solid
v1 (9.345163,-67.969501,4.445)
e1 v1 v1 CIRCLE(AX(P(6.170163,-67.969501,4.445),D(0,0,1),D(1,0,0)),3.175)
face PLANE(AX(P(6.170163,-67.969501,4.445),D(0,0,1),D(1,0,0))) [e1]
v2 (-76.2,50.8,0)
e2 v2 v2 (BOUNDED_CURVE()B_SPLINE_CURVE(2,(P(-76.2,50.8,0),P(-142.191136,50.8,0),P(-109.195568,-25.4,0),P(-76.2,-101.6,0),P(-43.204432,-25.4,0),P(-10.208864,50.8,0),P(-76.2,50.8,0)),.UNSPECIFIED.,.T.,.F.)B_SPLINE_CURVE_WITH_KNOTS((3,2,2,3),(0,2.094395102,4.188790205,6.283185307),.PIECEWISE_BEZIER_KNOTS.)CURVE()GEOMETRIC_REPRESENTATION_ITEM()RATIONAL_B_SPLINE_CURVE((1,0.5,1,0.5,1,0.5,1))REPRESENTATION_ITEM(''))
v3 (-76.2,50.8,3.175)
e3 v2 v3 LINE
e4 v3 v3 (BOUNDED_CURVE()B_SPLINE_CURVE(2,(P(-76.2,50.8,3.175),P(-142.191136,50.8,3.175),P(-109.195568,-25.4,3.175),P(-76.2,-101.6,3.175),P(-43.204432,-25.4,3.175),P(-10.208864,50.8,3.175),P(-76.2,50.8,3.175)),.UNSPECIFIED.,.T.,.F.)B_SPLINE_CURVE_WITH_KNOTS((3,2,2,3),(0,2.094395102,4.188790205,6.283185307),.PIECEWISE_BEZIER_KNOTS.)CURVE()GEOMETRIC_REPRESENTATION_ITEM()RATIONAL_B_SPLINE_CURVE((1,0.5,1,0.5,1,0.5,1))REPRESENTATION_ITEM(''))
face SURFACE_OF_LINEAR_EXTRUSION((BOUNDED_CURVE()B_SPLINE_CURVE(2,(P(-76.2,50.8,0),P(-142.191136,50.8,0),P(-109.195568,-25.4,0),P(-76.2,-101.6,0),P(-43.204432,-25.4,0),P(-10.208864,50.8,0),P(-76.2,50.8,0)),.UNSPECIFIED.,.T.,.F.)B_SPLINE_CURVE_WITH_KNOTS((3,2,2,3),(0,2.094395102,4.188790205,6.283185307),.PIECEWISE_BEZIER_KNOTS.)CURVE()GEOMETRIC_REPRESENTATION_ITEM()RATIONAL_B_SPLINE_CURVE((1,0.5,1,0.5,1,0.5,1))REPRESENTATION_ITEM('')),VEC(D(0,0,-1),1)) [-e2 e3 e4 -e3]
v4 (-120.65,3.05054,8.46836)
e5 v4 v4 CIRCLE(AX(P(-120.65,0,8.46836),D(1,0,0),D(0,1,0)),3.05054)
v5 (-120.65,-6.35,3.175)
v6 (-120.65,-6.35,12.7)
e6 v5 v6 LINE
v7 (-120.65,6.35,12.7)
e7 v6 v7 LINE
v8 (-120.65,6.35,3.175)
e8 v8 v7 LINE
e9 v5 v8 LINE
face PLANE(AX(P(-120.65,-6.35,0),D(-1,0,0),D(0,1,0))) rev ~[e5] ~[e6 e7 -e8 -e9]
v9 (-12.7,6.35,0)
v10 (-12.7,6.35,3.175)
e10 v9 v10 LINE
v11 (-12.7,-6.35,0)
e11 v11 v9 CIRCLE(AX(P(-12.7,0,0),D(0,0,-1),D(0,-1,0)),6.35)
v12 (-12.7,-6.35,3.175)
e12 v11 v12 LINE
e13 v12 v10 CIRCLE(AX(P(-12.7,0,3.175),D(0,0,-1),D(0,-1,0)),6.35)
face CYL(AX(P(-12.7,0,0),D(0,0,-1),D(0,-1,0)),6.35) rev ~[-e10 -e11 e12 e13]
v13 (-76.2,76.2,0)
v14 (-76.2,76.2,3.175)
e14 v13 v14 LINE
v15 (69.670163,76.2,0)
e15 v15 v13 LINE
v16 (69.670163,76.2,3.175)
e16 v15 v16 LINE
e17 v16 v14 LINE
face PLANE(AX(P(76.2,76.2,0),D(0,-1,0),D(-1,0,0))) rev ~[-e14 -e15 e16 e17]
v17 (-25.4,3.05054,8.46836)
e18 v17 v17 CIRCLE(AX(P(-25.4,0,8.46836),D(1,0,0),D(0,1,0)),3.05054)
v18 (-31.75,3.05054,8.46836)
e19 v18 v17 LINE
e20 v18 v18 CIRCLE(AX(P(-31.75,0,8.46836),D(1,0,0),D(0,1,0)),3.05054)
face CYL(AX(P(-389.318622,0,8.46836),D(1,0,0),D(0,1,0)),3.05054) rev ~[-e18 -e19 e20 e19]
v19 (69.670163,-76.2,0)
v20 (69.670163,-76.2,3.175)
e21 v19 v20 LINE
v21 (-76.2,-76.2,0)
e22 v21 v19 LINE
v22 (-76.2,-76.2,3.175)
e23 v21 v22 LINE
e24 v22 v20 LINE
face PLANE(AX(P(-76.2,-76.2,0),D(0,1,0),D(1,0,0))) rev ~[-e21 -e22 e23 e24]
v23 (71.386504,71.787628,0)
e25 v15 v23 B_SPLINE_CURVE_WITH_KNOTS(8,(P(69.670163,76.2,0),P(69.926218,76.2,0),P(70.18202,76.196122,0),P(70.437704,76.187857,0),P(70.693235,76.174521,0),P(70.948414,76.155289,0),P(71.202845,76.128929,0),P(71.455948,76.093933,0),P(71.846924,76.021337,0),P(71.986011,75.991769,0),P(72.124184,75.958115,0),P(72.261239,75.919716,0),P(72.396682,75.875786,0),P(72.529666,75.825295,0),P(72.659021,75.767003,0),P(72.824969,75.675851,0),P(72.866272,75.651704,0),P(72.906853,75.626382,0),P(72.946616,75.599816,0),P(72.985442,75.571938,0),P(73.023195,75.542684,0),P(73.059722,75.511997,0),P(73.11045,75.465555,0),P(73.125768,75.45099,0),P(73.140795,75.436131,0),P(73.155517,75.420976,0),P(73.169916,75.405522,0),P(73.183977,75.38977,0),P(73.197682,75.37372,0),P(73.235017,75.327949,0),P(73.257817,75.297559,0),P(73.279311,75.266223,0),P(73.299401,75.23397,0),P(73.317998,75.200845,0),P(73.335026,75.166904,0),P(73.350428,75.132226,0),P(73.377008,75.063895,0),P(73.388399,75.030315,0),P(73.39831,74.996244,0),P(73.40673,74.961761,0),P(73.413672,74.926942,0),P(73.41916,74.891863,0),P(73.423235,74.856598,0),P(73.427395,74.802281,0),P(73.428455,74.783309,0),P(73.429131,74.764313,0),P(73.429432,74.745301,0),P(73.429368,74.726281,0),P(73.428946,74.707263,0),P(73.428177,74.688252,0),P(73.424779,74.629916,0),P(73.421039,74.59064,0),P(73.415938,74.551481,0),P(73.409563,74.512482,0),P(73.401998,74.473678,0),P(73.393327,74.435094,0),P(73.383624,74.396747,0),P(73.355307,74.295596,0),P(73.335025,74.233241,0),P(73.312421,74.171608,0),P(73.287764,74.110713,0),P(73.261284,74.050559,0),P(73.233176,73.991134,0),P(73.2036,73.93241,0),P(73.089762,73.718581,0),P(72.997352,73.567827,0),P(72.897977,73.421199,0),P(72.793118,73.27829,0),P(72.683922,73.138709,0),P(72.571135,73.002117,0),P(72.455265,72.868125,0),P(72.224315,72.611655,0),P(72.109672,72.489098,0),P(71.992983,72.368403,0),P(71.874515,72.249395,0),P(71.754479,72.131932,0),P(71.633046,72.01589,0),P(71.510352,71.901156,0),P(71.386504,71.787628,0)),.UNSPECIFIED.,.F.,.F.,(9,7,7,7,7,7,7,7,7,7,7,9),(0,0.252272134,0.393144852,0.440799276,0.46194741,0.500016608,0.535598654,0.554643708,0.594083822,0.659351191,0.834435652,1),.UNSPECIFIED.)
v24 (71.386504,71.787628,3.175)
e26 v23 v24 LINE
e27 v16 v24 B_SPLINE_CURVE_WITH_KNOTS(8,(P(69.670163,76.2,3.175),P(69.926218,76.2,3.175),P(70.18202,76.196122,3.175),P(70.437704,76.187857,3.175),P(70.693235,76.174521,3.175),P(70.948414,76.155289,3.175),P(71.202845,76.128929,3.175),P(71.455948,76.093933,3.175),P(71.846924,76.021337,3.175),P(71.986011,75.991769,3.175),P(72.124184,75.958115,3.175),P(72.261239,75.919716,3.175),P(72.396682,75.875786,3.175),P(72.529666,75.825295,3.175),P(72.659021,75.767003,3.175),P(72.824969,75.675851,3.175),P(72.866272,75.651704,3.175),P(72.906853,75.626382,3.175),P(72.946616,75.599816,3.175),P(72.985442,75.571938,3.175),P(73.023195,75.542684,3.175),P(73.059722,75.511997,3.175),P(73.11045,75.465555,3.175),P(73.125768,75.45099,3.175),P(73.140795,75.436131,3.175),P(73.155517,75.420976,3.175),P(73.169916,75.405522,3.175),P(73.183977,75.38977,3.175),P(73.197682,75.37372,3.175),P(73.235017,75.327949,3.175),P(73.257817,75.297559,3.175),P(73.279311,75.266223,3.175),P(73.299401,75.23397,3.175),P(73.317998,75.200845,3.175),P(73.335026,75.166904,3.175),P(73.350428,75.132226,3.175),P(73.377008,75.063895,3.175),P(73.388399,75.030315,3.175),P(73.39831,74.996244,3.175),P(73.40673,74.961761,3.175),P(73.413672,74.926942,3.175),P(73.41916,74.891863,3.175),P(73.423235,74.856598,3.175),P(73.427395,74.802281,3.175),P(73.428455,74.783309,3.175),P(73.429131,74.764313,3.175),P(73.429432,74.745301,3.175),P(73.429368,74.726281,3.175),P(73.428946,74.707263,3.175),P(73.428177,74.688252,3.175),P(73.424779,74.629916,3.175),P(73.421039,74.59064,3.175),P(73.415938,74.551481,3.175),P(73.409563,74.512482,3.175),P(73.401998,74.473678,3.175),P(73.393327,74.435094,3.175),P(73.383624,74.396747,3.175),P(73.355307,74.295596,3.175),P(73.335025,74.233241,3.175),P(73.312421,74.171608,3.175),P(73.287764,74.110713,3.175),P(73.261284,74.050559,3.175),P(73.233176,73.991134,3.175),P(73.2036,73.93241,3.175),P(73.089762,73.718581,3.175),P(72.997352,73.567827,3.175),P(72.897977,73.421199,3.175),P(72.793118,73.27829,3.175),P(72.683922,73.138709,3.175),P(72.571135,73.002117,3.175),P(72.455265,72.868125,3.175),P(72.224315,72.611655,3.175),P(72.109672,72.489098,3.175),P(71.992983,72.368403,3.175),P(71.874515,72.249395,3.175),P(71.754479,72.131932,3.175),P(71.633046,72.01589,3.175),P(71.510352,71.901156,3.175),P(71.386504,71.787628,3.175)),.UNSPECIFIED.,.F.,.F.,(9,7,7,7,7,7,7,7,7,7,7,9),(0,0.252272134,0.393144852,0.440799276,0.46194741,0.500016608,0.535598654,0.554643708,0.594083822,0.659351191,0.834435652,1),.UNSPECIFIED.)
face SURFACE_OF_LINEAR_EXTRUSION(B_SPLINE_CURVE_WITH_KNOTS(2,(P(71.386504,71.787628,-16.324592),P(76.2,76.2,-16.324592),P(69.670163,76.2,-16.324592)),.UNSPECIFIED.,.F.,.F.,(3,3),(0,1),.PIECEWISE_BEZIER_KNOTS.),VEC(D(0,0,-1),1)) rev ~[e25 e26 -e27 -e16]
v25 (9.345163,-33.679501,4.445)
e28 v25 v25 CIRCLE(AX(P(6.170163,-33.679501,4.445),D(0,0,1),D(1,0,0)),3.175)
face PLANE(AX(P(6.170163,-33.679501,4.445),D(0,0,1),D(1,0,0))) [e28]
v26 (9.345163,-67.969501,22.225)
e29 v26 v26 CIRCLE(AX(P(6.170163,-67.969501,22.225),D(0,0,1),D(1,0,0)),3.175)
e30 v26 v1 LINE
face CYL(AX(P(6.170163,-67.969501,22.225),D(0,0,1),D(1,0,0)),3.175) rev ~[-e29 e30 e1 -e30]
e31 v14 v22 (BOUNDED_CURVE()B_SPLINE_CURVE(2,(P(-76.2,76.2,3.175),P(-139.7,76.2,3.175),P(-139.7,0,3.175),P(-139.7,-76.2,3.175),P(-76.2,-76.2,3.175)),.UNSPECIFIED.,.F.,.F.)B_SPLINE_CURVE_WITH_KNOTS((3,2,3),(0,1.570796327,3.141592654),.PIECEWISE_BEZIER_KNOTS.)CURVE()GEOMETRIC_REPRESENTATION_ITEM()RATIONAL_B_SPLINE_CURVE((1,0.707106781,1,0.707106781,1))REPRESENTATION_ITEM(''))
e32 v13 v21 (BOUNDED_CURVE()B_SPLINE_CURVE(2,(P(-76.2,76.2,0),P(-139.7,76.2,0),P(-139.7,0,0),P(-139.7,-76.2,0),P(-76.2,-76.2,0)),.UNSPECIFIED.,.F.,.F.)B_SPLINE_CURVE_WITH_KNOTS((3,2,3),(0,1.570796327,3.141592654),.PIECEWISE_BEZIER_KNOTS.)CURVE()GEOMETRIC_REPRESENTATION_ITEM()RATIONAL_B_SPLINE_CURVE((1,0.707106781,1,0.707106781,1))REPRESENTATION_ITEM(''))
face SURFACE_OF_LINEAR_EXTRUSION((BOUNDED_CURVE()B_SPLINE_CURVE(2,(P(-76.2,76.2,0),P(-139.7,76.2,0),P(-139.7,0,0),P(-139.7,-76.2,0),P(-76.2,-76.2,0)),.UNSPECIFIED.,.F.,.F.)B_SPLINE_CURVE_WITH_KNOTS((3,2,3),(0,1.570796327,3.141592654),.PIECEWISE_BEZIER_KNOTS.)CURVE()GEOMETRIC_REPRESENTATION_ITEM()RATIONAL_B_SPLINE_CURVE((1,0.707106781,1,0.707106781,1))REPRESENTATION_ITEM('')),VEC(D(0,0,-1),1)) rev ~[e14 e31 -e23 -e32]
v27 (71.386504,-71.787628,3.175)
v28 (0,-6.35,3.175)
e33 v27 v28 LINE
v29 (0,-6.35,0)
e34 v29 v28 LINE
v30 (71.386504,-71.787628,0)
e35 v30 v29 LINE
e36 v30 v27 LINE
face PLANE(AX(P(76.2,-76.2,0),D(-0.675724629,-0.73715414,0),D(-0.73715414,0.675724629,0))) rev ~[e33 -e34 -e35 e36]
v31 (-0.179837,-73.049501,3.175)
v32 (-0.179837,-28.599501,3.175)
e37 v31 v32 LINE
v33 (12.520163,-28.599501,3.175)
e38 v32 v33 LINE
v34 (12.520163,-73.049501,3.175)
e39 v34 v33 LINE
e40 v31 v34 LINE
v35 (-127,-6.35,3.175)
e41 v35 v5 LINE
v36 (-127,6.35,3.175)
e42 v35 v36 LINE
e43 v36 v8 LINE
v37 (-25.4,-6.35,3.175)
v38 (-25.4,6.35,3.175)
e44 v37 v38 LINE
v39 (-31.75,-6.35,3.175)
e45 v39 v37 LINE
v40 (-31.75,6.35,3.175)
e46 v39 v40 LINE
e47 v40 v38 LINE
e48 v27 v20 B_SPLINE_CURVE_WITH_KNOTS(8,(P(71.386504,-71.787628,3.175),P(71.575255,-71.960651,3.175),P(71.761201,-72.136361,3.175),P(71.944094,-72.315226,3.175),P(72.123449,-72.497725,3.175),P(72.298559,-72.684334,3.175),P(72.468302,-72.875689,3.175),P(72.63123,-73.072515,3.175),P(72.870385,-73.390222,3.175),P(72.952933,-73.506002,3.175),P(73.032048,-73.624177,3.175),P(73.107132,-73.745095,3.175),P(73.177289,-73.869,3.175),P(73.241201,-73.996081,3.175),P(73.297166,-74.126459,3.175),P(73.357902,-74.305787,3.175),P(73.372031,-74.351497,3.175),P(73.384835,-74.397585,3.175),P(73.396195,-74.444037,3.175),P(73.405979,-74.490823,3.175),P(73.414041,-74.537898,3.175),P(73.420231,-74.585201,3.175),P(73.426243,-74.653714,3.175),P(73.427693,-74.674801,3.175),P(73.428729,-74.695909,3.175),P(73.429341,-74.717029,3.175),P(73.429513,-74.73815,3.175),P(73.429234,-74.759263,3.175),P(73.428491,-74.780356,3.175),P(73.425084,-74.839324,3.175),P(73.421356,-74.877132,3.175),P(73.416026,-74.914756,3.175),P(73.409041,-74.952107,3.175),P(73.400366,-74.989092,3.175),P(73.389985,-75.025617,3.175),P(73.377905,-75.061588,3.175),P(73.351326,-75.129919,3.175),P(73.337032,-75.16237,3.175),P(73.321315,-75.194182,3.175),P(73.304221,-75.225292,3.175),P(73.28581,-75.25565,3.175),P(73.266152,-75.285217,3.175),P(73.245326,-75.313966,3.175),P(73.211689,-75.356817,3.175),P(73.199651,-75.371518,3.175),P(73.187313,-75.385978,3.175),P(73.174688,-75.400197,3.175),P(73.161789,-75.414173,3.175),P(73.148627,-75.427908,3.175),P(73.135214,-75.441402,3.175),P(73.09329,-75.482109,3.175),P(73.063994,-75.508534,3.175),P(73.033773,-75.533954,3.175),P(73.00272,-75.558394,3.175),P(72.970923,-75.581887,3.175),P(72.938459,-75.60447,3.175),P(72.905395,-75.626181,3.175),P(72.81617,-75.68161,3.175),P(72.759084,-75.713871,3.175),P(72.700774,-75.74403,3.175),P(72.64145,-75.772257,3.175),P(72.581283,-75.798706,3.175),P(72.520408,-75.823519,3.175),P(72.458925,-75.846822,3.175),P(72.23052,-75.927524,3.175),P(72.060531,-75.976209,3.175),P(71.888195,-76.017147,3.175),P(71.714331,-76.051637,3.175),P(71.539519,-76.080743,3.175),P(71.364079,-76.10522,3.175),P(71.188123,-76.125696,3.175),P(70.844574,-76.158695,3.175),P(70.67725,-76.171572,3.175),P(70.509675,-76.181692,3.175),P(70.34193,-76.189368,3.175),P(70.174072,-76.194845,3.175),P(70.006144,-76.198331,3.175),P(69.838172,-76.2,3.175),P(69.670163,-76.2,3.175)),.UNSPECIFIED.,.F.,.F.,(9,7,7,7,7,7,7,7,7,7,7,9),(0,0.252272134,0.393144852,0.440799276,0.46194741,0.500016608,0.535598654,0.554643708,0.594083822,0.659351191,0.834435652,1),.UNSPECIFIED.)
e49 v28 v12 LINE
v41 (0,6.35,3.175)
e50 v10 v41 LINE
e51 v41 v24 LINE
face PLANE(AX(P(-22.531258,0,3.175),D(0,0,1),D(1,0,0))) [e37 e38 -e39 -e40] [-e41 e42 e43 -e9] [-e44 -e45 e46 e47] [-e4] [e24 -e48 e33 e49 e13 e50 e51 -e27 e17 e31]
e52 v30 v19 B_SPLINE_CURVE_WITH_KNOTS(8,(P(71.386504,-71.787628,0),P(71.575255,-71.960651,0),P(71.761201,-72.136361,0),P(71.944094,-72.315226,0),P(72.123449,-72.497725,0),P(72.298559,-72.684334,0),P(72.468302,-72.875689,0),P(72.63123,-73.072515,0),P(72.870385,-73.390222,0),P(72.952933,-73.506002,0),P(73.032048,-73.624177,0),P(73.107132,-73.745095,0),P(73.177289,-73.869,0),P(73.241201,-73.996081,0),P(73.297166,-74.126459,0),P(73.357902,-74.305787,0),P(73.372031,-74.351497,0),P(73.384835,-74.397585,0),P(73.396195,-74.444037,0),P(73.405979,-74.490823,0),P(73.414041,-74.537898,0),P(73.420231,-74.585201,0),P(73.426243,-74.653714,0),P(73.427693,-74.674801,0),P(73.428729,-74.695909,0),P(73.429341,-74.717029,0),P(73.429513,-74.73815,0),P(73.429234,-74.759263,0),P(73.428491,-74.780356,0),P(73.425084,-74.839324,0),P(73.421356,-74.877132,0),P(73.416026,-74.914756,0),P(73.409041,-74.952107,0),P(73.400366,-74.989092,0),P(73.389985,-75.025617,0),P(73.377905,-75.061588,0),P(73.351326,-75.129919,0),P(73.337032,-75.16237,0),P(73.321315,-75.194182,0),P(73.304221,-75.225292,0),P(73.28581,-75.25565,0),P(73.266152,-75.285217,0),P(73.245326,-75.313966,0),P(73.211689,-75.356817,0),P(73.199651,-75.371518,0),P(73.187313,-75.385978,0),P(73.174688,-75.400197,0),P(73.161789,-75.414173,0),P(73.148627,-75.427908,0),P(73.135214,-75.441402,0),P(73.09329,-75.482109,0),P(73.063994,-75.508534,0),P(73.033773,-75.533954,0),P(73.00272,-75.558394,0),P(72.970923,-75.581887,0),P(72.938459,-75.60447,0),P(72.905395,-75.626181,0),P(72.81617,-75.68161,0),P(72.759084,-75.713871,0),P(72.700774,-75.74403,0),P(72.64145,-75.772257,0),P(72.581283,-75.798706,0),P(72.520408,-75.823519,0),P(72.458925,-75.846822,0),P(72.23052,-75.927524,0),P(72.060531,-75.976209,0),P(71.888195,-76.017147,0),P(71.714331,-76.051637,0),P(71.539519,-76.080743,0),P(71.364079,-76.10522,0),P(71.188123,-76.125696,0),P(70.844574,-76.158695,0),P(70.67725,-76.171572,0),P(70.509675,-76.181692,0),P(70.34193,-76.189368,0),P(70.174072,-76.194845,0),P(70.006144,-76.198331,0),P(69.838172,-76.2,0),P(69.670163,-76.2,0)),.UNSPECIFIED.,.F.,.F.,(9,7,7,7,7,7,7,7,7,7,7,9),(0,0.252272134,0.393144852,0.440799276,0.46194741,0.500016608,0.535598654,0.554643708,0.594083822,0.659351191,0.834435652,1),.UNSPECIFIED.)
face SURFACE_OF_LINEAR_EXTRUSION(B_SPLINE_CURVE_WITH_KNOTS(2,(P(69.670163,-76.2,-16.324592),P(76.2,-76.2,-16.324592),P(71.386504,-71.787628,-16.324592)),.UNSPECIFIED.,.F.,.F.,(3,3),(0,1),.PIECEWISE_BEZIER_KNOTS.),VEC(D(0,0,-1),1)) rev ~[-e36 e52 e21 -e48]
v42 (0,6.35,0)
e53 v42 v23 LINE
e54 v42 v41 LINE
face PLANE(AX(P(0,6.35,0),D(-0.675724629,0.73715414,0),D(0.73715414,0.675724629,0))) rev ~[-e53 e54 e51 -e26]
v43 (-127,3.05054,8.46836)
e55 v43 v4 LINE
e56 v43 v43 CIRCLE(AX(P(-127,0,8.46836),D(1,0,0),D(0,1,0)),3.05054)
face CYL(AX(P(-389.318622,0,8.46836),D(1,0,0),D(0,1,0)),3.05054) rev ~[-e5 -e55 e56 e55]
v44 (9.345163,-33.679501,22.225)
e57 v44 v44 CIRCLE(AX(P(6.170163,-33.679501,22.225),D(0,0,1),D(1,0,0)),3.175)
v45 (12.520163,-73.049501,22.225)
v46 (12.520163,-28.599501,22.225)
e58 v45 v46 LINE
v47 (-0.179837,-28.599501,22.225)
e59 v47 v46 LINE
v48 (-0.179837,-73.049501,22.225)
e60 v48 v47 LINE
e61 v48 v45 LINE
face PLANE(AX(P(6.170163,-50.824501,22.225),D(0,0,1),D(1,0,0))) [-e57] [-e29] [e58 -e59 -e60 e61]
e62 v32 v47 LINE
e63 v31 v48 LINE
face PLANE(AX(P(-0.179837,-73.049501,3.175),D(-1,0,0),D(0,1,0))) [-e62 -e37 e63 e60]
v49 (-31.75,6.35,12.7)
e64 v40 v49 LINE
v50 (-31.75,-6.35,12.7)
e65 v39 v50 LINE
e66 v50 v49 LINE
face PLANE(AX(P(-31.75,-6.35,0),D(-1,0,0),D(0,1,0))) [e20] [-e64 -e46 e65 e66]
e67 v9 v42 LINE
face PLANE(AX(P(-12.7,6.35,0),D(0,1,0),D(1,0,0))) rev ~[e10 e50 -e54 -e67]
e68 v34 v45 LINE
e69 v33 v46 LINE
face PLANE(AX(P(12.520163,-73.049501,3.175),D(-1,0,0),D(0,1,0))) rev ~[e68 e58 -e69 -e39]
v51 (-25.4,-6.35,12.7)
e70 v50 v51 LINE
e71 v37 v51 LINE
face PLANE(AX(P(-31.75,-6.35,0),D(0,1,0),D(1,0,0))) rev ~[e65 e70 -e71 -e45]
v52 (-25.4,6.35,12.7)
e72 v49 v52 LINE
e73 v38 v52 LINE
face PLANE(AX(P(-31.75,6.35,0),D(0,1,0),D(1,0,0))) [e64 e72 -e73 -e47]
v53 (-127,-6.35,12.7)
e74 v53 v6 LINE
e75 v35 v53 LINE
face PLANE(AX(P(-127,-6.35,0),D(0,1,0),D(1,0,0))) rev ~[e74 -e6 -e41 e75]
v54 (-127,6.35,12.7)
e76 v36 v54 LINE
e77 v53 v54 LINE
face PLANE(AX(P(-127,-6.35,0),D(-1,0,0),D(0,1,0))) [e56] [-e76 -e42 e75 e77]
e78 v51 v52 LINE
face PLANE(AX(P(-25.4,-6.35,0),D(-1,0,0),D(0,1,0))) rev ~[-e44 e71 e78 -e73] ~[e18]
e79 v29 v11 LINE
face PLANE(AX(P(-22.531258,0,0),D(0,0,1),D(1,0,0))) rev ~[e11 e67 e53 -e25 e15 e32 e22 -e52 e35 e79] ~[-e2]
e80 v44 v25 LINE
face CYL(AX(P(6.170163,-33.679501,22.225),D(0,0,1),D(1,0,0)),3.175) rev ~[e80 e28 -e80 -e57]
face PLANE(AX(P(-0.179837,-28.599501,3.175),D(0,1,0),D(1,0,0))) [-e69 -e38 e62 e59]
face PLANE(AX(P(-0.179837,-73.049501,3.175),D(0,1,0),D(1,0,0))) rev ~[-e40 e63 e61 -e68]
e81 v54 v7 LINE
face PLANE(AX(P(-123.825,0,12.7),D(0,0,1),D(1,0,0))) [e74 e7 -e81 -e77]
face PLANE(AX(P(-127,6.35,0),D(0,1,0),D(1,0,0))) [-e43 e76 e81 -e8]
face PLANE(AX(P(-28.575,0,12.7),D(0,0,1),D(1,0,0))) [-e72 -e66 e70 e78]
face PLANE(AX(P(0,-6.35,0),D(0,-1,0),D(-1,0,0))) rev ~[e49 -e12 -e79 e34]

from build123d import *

# Parameters (mm, degrees)
F0_W        = 6.35
F0_H        = 12.7
F1_DEPTH    = 3.175
F3_T1_DEPTH = 35.8241837791
F4_DEPTH    = 12.7
F6_D        = 6.10108
F7_W        = 12.7
F7_H        = 44.45
F8_DEPTH    = 19.05
F9_R        = 3.175
F10_DEPTH   = 17.78
F11_DEPTH   = 17.78


# Not quite as in the source:
# - a fillet or chamfer that OpenCascade refuses, or shapes differently, is made with other operations: its cross-section is extruded or revolved along the edge and cut away or added
# - a feature of the source that left no trace in its solid (it failed there, or was rolled back) is left out


with BuildPart() as f1:
    # F0 (on Top) → F1 (new body)
    with BuildSketch(Plane.XY):
        with BuildLine():
            Line((76.2, 76.2), (-76.2, 76.2))
            add(Edge.make_bspline(
                [(-76.2, 76.2), (-139.7, 76.2), (-139.7, 0), (-139.7, -76.2), (-76.2, -76.2)],
                knots=[0, 0, 0, 1.5707963268, 1.5707963268, 3.1415926536, 3.1415926536, 3.1415926536], degree=2, weights=[1, 0.7071067812, 1, 0.7071067812, 1]))
            Line((-76.2, -76.2), (76.2, -76.2))
            Line((76.2, -76.2), (0, -6.35))
            Line((0, -6.35), (-12.7, -6.35))
            ThreePointArc((-12.7, -6.35), (-19.05, 0), (-12.7, 6.35))
            Line((-12.7, 6.35), (0, 6.35))
            Line((0, 6.35), (76.2, 76.2))
        make_face()
        with Locations((-123.825, 0)):
            Rectangle(F0_W, F0_H, mode=Mode.SUBTRACT)
        with BuildLine():
            add(Edge.make_bspline(
                [(-76.2, 50.8), (-142.1911357684, 50.8), (-109.1955678842, -25.4), (-76.2, -101.6), (-43.2044321158, -25.4), (-10.2088642316, 50.8), (-76.2, 50.8)],
                knots=[0, 0, 0, 2.0943951024, 2.0943951024, 4.1887902048, 4.1887902048, 6.2831853072, 6.2831853072, 6.2831853072], degree=2, weights=[1, 0.5, 1, 0.5, 1, 0.5, 1]))
        make_face(mode=Mode.SUBTRACT)
        with Locations((-28.575, 0)):
            Rectangle(F0_W, F0_H, mode=Mode.SUBTRACT)
    extrude(amount=F1_DEPTH)

    # F3: fillet of radius 2.54 on 2 edges, made by hand

    # F3_s2 → F3_t1 (cut)
    with BuildSketch(Plane.XY.offset(-16.3245918896)):
        with BuildLine():
            add(Edge.make_bspline(
                [(71.3865038006, 71.7876284839), (76.2, 76.2), (69.6701632442, 76.2)],
                knots=[0, 0, 0, 1, 1, 1], degree=2, weights=[1, 1, 1]))
            Line((69.6701632442, 76.2), (76.2, 76.2))
            Line((76.2, 76.2), (71.3865038006, 71.7876284839))
        make_face()
        with BuildLine():
            add(Edge.make_bspline(
                [(69.6701632442, -76.2), (76.2, -76.2), (71.3865038006, -71.7876284839)],
                knots=[0, 0, 0, 1, 1, 1], degree=2, weights=[1, 1, 1]))
            Line((71.3865038006, -71.7876284839), (76.2, -76.2))
            Line((76.2, -76.2), (69.6701632442, -76.2))
        make_face()
    extrude(amount=F3_T1_DEPTH, mode=Mode.SUBTRACT)

    # F0 (on Top) → F4 (join)
    with BuildSketch(Plane.XY):
        with Locations((-28.575, 0)):
            Rectangle(F0_W, F0_H)
        with Locations((-123.825, 0)):
            Rectangle(F0_W, F0_H)
    extrude(amount=F4_DEPTH)

    # F6 (through all)
    with Locations(Plane(origin=(-127, 0, 0), x_dir=(0, -1, 0), z_dir=(-1, 0, 0))):
        with Locations((0, 8.46836)):
            Hole(F6_D / 2)

    # F7 (on face) → F8 (join)
    with BuildSketch(Plane.XY.offset(3.175)):
        with Locations((6.1701632442, -50.8245005846)):
            Rectangle(F7_W, F7_H)
    extrude(amount=F8_DEPTH)

    # F9 (on face) → F10 (cut)
    with BuildSketch(Plane.XY.offset(22.225)):
        with Locations((6.1701632442, -67.9695005846)):
            Circle(F9_R)
    extrude(amount=-F10_DEPTH, mode=Mode.SUBTRACT)

    # F9 (on face) → F11 (cut)
    with BuildSketch(Plane.XY.offset(22.225)):
        with Locations((6.1701632442, -67.9695005846)):
            Circle(F9_R)
        with Locations((6.1701632442, -33.6795005846)):
            Circle(F9_R)
    extrude(amount=-F11_DEPTH, mode=Mode.SUBTRACT)


solid = f1.part
